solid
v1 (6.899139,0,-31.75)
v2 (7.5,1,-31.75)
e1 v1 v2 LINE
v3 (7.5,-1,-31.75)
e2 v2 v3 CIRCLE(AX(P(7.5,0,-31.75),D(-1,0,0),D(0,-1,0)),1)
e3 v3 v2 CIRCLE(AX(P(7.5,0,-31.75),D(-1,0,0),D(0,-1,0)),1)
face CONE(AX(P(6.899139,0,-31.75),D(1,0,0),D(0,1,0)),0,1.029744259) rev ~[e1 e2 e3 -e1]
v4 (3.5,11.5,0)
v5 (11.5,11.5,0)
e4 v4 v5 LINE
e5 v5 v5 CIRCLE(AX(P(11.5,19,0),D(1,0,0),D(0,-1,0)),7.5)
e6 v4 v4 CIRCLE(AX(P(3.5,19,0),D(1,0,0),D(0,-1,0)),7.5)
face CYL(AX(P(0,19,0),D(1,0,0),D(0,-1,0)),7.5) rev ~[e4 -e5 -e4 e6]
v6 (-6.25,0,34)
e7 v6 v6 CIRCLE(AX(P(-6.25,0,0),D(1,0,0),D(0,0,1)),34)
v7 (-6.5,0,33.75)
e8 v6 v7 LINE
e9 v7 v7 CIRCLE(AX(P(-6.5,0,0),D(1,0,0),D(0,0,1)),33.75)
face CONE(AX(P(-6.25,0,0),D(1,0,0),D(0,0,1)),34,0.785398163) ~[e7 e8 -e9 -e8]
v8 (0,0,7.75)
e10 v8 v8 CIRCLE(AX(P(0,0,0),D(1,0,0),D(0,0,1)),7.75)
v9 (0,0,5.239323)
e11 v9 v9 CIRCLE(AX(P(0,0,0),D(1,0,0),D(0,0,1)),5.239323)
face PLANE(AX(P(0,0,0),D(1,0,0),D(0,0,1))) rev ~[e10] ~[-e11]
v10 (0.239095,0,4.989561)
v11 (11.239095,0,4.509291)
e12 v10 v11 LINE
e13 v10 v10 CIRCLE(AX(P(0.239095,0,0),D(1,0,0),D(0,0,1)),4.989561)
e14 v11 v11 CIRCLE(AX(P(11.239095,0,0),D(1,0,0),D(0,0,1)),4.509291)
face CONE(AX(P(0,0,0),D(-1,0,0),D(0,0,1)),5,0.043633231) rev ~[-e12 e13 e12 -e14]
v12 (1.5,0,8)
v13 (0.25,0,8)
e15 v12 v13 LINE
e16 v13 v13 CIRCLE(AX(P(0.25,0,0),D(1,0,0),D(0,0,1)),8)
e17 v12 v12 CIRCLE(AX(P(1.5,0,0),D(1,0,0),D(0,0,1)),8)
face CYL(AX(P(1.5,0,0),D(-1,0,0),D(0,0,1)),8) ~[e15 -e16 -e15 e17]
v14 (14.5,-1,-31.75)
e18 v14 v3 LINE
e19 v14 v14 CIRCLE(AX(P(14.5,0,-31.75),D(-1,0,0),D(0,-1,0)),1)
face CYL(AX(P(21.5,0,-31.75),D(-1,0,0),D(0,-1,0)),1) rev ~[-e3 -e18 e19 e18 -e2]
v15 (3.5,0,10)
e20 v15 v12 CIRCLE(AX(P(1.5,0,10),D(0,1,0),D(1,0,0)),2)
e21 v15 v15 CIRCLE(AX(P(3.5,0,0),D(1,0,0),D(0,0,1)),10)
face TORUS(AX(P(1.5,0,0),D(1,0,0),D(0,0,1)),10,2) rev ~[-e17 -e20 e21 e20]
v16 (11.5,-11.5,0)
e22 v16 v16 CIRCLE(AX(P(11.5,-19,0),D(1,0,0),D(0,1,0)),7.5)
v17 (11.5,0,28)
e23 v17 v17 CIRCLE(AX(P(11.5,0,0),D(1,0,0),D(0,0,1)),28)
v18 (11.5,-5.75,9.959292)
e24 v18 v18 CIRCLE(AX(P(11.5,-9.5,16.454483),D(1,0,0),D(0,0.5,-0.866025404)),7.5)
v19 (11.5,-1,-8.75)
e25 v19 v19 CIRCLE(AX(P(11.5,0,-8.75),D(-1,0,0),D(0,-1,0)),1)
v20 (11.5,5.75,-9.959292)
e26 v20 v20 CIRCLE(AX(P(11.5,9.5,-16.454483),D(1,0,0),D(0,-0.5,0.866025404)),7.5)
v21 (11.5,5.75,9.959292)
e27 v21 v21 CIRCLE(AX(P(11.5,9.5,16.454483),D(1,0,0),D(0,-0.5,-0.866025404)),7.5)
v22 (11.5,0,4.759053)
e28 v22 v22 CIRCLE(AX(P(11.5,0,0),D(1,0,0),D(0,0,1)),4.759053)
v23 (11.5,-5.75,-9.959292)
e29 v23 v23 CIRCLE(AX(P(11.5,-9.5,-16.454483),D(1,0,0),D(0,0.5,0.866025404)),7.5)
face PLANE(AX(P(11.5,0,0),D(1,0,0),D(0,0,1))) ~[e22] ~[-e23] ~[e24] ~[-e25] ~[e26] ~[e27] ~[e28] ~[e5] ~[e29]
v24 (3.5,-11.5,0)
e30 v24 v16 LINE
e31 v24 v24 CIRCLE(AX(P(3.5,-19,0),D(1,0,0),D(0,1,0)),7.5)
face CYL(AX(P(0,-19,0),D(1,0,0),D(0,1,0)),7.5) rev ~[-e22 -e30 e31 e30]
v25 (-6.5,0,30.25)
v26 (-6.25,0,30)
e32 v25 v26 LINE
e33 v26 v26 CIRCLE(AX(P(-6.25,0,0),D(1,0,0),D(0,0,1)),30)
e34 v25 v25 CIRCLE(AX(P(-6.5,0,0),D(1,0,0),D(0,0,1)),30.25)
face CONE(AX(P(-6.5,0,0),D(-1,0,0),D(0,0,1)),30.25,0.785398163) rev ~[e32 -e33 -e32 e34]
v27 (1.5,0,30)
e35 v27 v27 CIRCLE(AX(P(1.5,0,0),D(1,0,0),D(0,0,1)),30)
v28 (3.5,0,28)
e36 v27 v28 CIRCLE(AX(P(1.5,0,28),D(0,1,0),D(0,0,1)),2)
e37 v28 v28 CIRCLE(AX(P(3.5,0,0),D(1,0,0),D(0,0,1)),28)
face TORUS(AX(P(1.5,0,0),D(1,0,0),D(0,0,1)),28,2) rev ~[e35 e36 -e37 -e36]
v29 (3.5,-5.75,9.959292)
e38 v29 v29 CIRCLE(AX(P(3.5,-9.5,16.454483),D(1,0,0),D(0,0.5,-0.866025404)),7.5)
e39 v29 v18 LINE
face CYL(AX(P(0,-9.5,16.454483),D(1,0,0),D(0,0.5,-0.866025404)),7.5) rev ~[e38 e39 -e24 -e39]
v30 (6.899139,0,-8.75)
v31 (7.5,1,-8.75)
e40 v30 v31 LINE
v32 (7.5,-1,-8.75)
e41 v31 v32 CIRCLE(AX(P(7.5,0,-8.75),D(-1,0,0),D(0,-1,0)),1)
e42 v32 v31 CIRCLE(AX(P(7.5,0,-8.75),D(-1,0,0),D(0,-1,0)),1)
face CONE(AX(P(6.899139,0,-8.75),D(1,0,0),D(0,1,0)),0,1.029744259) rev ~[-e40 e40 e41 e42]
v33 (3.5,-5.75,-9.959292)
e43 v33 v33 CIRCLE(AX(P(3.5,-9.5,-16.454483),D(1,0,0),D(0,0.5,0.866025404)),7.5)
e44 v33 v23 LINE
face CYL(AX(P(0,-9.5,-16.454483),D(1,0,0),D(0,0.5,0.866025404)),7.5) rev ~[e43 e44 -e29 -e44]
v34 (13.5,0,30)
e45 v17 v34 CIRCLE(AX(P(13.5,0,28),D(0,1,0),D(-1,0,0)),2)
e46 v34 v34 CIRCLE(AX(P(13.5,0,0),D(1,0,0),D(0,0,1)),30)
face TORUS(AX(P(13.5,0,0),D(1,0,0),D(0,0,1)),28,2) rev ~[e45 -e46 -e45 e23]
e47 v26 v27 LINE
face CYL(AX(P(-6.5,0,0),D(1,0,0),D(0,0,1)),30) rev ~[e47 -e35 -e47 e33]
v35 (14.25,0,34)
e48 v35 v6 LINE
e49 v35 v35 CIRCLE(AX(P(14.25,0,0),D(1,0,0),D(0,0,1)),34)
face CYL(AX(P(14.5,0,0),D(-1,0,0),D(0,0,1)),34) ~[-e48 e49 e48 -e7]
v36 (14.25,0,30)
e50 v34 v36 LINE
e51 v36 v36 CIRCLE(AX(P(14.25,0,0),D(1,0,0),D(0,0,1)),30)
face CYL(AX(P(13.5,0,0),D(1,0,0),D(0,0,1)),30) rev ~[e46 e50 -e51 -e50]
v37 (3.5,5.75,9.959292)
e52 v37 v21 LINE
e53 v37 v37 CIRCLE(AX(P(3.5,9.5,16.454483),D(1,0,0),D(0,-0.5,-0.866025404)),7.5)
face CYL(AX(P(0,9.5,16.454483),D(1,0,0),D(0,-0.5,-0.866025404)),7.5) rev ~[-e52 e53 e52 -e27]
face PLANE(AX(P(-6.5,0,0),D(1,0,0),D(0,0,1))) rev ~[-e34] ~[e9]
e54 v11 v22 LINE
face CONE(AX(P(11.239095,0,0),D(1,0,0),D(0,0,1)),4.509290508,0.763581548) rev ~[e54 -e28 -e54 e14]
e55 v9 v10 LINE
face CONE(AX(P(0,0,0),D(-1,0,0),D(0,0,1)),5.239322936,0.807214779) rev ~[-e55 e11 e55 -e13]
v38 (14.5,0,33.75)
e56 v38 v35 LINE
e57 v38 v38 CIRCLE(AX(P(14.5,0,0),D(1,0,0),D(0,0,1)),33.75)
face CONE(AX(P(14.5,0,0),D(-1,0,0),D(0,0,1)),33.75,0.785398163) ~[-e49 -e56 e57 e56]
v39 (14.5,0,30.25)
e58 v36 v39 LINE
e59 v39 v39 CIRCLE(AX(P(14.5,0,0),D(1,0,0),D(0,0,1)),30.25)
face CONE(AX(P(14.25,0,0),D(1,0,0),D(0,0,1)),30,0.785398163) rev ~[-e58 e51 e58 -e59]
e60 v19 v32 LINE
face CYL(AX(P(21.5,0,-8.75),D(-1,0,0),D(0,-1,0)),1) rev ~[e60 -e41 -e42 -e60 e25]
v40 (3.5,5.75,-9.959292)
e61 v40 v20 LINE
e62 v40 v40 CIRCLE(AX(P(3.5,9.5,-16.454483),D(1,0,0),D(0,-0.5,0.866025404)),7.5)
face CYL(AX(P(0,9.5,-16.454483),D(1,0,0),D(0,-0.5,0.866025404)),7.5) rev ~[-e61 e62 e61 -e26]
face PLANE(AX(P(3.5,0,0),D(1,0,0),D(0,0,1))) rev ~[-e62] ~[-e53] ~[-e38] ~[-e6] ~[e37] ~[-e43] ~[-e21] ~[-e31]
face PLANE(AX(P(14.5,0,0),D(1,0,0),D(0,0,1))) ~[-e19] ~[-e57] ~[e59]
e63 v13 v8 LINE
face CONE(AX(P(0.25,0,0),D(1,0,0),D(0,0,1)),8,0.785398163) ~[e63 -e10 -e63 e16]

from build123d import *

# Parameters (mm, degrees)
F3_R            = 7.5
F4_DEPTH        = 12.5
F4_COPIES_COUNT = 6
F6_D            = 2
F6_DEPTH        = 7
F6_TIP          = 0.600860619


# Not quite as in the source:
# - a fillet or chamfer that OpenCascade refuses, or shapes differently, is made with other operations: its cross-section is extruded or revolved along the edge and cut away or added
# - a pattern or mirror of a feature is missing from the dataset's text; its kind, count and spacing are read off the source's solid


with BuildPart() as f1:
    # F0 (on Front) → F1 (revolve)
    with BuildSketch(Plane.XZ):
        with BuildLine():
            Line((0, 8), (0, 5))
            Line((0, 5), (11.5, 4.4978991566))
            Line((11.5, 4.4978991566), (11.5, 28))
            ThreePointArc((11.5, 28), (12.0857864376, 29.4142135624), (13.5, 30))
            Line((13.5, 30), (14.5, 30))
            Line((14.5, 30), (14.5, 34))
            Line((14.5, 34), (-6.5, 34))
            Line((-6.5, 34), (-6.5, 30))
            Line((-6.5, 30), (1.5, 30))
            ThreePointArc((1.5, 30), (2.9142135624, 29.4142135624), (3.5, 28))
            Line((3.5, 28), (3.5, 10))
            ThreePointArc((3.5, 10), (2.9142135624, 8.5857864376), (1.5, 8))
            Line((1.5, 8), (0, 8))
        make_face()
    revolve(axis=Axis((5.75, 0, 0), (1, 0, 0)))

    # F2: chamfer of 0.25 on 7 edges, made by hand

    # F2_s1 → F2_t2 (revolve, cut)
    with BuildSketch(Plane.XZ):
        Polygon((-6.25, 34), (-6.5, 33.75), (-6.5, 34), align=None)
    revolve(axis=Axis((-6.5, 0, 0), (1, 0, 0)), mode=Mode.SUBTRACT)

    # F2_s3 → F2_t4 (revolve, cut)
    with BuildSketch(Plane.XZ):
        Polygon((-6.5, 30.25), (-6.25, 30), (-6.5, 30), align=None)
    revolve(axis=Axis((-6.5, 0, 0), (1, 0, 0)), mode=Mode.SUBTRACT)

    # F2_s5 → F2_t6 (revolve, cut)
    with BuildSketch(Plane.XZ):
        Polygon((14.25, 30), (14.5, 30.25), (14.5, 30), align=None)
    revolve(axis=Axis((14.5, 0, 0), (1, 0, 0)), mode=Mode.SUBTRACT)

    # F2_s7 → F2_t8 (revolve, cut)
    with BuildSketch(Plane.XZ):
        Polygon((14.5, 33.75), (14.25, 34), (14.5, 34), align=None)
    revolve(axis=Axis((14.5, 0, 0), (1, 0, 0)), mode=Mode.SUBTRACT)

    # F2_s9 → F2_t10 (revolve, cut)
    with BuildSketch(Plane.XZ):
        Polygon((0.25, 8), (0, 7.75), (0, 8), align=None)
    revolve(axis=Axis((0, 0, 0), (1, 0, 0)), mode=Mode.SUBTRACT)

    # F2_s11 → F2_t12 (revolve, cut)
    with BuildSketch(Plane.XZ):
        Polygon((0, 5.2393229356), (0.2390951532, 4.9895608802), (0, 5), align=None)
    revolve(axis=Axis((0, 0, 0), (1, 0, 0)), mode=Mode.SUBTRACT)

    # F2_s13 → F2_t14 (revolve, cut)
    with BuildSketch(Plane.XZ):
        Polygon((11.2390951532, 4.5092905082), (11.5, 4.7590525636), (11.5, 4.4978991566), align=None)
    revolve(axis=Axis((11.5, 0, 0), (1, 0, 0)), mode=Mode.SUBTRACT)

    # F3 (on Right) → F4 (cut, symmetric)
    with BuildSketch(Plane.YZ):
        with Locations((-19, 0)):
            Circle(F3_R)
    f4 = extrude(amount=F4_DEPTH, both=True, mode=Mode.SUBTRACT)

    # F4_copies: F4 ×6 about axis
    f4_copies_axis = Axis((0, 0, 0), (1, 0, 0))
    for i in range(1, F4_COPIES_COUNT):
        add(f4.rotate(f4_copies_axis, i * 360 / F4_COPIES_COUNT), mode=Mode.SUBTRACT)

    # F6
    with Locations(Plane.YZ.offset(14.5)):
        with Locations((0, -31.75), (0, -8.75)):
            Hole(F6_D / 2, depth=F6_DEPTH)
            with Locations((0, 0, -(F6_DEPTH + F6_TIP / 2))):  # 118° drill point
                Cone(0, F6_D / 2, F6_TIP, mode=Mode.SUBTRACT)


solid = f1.part
